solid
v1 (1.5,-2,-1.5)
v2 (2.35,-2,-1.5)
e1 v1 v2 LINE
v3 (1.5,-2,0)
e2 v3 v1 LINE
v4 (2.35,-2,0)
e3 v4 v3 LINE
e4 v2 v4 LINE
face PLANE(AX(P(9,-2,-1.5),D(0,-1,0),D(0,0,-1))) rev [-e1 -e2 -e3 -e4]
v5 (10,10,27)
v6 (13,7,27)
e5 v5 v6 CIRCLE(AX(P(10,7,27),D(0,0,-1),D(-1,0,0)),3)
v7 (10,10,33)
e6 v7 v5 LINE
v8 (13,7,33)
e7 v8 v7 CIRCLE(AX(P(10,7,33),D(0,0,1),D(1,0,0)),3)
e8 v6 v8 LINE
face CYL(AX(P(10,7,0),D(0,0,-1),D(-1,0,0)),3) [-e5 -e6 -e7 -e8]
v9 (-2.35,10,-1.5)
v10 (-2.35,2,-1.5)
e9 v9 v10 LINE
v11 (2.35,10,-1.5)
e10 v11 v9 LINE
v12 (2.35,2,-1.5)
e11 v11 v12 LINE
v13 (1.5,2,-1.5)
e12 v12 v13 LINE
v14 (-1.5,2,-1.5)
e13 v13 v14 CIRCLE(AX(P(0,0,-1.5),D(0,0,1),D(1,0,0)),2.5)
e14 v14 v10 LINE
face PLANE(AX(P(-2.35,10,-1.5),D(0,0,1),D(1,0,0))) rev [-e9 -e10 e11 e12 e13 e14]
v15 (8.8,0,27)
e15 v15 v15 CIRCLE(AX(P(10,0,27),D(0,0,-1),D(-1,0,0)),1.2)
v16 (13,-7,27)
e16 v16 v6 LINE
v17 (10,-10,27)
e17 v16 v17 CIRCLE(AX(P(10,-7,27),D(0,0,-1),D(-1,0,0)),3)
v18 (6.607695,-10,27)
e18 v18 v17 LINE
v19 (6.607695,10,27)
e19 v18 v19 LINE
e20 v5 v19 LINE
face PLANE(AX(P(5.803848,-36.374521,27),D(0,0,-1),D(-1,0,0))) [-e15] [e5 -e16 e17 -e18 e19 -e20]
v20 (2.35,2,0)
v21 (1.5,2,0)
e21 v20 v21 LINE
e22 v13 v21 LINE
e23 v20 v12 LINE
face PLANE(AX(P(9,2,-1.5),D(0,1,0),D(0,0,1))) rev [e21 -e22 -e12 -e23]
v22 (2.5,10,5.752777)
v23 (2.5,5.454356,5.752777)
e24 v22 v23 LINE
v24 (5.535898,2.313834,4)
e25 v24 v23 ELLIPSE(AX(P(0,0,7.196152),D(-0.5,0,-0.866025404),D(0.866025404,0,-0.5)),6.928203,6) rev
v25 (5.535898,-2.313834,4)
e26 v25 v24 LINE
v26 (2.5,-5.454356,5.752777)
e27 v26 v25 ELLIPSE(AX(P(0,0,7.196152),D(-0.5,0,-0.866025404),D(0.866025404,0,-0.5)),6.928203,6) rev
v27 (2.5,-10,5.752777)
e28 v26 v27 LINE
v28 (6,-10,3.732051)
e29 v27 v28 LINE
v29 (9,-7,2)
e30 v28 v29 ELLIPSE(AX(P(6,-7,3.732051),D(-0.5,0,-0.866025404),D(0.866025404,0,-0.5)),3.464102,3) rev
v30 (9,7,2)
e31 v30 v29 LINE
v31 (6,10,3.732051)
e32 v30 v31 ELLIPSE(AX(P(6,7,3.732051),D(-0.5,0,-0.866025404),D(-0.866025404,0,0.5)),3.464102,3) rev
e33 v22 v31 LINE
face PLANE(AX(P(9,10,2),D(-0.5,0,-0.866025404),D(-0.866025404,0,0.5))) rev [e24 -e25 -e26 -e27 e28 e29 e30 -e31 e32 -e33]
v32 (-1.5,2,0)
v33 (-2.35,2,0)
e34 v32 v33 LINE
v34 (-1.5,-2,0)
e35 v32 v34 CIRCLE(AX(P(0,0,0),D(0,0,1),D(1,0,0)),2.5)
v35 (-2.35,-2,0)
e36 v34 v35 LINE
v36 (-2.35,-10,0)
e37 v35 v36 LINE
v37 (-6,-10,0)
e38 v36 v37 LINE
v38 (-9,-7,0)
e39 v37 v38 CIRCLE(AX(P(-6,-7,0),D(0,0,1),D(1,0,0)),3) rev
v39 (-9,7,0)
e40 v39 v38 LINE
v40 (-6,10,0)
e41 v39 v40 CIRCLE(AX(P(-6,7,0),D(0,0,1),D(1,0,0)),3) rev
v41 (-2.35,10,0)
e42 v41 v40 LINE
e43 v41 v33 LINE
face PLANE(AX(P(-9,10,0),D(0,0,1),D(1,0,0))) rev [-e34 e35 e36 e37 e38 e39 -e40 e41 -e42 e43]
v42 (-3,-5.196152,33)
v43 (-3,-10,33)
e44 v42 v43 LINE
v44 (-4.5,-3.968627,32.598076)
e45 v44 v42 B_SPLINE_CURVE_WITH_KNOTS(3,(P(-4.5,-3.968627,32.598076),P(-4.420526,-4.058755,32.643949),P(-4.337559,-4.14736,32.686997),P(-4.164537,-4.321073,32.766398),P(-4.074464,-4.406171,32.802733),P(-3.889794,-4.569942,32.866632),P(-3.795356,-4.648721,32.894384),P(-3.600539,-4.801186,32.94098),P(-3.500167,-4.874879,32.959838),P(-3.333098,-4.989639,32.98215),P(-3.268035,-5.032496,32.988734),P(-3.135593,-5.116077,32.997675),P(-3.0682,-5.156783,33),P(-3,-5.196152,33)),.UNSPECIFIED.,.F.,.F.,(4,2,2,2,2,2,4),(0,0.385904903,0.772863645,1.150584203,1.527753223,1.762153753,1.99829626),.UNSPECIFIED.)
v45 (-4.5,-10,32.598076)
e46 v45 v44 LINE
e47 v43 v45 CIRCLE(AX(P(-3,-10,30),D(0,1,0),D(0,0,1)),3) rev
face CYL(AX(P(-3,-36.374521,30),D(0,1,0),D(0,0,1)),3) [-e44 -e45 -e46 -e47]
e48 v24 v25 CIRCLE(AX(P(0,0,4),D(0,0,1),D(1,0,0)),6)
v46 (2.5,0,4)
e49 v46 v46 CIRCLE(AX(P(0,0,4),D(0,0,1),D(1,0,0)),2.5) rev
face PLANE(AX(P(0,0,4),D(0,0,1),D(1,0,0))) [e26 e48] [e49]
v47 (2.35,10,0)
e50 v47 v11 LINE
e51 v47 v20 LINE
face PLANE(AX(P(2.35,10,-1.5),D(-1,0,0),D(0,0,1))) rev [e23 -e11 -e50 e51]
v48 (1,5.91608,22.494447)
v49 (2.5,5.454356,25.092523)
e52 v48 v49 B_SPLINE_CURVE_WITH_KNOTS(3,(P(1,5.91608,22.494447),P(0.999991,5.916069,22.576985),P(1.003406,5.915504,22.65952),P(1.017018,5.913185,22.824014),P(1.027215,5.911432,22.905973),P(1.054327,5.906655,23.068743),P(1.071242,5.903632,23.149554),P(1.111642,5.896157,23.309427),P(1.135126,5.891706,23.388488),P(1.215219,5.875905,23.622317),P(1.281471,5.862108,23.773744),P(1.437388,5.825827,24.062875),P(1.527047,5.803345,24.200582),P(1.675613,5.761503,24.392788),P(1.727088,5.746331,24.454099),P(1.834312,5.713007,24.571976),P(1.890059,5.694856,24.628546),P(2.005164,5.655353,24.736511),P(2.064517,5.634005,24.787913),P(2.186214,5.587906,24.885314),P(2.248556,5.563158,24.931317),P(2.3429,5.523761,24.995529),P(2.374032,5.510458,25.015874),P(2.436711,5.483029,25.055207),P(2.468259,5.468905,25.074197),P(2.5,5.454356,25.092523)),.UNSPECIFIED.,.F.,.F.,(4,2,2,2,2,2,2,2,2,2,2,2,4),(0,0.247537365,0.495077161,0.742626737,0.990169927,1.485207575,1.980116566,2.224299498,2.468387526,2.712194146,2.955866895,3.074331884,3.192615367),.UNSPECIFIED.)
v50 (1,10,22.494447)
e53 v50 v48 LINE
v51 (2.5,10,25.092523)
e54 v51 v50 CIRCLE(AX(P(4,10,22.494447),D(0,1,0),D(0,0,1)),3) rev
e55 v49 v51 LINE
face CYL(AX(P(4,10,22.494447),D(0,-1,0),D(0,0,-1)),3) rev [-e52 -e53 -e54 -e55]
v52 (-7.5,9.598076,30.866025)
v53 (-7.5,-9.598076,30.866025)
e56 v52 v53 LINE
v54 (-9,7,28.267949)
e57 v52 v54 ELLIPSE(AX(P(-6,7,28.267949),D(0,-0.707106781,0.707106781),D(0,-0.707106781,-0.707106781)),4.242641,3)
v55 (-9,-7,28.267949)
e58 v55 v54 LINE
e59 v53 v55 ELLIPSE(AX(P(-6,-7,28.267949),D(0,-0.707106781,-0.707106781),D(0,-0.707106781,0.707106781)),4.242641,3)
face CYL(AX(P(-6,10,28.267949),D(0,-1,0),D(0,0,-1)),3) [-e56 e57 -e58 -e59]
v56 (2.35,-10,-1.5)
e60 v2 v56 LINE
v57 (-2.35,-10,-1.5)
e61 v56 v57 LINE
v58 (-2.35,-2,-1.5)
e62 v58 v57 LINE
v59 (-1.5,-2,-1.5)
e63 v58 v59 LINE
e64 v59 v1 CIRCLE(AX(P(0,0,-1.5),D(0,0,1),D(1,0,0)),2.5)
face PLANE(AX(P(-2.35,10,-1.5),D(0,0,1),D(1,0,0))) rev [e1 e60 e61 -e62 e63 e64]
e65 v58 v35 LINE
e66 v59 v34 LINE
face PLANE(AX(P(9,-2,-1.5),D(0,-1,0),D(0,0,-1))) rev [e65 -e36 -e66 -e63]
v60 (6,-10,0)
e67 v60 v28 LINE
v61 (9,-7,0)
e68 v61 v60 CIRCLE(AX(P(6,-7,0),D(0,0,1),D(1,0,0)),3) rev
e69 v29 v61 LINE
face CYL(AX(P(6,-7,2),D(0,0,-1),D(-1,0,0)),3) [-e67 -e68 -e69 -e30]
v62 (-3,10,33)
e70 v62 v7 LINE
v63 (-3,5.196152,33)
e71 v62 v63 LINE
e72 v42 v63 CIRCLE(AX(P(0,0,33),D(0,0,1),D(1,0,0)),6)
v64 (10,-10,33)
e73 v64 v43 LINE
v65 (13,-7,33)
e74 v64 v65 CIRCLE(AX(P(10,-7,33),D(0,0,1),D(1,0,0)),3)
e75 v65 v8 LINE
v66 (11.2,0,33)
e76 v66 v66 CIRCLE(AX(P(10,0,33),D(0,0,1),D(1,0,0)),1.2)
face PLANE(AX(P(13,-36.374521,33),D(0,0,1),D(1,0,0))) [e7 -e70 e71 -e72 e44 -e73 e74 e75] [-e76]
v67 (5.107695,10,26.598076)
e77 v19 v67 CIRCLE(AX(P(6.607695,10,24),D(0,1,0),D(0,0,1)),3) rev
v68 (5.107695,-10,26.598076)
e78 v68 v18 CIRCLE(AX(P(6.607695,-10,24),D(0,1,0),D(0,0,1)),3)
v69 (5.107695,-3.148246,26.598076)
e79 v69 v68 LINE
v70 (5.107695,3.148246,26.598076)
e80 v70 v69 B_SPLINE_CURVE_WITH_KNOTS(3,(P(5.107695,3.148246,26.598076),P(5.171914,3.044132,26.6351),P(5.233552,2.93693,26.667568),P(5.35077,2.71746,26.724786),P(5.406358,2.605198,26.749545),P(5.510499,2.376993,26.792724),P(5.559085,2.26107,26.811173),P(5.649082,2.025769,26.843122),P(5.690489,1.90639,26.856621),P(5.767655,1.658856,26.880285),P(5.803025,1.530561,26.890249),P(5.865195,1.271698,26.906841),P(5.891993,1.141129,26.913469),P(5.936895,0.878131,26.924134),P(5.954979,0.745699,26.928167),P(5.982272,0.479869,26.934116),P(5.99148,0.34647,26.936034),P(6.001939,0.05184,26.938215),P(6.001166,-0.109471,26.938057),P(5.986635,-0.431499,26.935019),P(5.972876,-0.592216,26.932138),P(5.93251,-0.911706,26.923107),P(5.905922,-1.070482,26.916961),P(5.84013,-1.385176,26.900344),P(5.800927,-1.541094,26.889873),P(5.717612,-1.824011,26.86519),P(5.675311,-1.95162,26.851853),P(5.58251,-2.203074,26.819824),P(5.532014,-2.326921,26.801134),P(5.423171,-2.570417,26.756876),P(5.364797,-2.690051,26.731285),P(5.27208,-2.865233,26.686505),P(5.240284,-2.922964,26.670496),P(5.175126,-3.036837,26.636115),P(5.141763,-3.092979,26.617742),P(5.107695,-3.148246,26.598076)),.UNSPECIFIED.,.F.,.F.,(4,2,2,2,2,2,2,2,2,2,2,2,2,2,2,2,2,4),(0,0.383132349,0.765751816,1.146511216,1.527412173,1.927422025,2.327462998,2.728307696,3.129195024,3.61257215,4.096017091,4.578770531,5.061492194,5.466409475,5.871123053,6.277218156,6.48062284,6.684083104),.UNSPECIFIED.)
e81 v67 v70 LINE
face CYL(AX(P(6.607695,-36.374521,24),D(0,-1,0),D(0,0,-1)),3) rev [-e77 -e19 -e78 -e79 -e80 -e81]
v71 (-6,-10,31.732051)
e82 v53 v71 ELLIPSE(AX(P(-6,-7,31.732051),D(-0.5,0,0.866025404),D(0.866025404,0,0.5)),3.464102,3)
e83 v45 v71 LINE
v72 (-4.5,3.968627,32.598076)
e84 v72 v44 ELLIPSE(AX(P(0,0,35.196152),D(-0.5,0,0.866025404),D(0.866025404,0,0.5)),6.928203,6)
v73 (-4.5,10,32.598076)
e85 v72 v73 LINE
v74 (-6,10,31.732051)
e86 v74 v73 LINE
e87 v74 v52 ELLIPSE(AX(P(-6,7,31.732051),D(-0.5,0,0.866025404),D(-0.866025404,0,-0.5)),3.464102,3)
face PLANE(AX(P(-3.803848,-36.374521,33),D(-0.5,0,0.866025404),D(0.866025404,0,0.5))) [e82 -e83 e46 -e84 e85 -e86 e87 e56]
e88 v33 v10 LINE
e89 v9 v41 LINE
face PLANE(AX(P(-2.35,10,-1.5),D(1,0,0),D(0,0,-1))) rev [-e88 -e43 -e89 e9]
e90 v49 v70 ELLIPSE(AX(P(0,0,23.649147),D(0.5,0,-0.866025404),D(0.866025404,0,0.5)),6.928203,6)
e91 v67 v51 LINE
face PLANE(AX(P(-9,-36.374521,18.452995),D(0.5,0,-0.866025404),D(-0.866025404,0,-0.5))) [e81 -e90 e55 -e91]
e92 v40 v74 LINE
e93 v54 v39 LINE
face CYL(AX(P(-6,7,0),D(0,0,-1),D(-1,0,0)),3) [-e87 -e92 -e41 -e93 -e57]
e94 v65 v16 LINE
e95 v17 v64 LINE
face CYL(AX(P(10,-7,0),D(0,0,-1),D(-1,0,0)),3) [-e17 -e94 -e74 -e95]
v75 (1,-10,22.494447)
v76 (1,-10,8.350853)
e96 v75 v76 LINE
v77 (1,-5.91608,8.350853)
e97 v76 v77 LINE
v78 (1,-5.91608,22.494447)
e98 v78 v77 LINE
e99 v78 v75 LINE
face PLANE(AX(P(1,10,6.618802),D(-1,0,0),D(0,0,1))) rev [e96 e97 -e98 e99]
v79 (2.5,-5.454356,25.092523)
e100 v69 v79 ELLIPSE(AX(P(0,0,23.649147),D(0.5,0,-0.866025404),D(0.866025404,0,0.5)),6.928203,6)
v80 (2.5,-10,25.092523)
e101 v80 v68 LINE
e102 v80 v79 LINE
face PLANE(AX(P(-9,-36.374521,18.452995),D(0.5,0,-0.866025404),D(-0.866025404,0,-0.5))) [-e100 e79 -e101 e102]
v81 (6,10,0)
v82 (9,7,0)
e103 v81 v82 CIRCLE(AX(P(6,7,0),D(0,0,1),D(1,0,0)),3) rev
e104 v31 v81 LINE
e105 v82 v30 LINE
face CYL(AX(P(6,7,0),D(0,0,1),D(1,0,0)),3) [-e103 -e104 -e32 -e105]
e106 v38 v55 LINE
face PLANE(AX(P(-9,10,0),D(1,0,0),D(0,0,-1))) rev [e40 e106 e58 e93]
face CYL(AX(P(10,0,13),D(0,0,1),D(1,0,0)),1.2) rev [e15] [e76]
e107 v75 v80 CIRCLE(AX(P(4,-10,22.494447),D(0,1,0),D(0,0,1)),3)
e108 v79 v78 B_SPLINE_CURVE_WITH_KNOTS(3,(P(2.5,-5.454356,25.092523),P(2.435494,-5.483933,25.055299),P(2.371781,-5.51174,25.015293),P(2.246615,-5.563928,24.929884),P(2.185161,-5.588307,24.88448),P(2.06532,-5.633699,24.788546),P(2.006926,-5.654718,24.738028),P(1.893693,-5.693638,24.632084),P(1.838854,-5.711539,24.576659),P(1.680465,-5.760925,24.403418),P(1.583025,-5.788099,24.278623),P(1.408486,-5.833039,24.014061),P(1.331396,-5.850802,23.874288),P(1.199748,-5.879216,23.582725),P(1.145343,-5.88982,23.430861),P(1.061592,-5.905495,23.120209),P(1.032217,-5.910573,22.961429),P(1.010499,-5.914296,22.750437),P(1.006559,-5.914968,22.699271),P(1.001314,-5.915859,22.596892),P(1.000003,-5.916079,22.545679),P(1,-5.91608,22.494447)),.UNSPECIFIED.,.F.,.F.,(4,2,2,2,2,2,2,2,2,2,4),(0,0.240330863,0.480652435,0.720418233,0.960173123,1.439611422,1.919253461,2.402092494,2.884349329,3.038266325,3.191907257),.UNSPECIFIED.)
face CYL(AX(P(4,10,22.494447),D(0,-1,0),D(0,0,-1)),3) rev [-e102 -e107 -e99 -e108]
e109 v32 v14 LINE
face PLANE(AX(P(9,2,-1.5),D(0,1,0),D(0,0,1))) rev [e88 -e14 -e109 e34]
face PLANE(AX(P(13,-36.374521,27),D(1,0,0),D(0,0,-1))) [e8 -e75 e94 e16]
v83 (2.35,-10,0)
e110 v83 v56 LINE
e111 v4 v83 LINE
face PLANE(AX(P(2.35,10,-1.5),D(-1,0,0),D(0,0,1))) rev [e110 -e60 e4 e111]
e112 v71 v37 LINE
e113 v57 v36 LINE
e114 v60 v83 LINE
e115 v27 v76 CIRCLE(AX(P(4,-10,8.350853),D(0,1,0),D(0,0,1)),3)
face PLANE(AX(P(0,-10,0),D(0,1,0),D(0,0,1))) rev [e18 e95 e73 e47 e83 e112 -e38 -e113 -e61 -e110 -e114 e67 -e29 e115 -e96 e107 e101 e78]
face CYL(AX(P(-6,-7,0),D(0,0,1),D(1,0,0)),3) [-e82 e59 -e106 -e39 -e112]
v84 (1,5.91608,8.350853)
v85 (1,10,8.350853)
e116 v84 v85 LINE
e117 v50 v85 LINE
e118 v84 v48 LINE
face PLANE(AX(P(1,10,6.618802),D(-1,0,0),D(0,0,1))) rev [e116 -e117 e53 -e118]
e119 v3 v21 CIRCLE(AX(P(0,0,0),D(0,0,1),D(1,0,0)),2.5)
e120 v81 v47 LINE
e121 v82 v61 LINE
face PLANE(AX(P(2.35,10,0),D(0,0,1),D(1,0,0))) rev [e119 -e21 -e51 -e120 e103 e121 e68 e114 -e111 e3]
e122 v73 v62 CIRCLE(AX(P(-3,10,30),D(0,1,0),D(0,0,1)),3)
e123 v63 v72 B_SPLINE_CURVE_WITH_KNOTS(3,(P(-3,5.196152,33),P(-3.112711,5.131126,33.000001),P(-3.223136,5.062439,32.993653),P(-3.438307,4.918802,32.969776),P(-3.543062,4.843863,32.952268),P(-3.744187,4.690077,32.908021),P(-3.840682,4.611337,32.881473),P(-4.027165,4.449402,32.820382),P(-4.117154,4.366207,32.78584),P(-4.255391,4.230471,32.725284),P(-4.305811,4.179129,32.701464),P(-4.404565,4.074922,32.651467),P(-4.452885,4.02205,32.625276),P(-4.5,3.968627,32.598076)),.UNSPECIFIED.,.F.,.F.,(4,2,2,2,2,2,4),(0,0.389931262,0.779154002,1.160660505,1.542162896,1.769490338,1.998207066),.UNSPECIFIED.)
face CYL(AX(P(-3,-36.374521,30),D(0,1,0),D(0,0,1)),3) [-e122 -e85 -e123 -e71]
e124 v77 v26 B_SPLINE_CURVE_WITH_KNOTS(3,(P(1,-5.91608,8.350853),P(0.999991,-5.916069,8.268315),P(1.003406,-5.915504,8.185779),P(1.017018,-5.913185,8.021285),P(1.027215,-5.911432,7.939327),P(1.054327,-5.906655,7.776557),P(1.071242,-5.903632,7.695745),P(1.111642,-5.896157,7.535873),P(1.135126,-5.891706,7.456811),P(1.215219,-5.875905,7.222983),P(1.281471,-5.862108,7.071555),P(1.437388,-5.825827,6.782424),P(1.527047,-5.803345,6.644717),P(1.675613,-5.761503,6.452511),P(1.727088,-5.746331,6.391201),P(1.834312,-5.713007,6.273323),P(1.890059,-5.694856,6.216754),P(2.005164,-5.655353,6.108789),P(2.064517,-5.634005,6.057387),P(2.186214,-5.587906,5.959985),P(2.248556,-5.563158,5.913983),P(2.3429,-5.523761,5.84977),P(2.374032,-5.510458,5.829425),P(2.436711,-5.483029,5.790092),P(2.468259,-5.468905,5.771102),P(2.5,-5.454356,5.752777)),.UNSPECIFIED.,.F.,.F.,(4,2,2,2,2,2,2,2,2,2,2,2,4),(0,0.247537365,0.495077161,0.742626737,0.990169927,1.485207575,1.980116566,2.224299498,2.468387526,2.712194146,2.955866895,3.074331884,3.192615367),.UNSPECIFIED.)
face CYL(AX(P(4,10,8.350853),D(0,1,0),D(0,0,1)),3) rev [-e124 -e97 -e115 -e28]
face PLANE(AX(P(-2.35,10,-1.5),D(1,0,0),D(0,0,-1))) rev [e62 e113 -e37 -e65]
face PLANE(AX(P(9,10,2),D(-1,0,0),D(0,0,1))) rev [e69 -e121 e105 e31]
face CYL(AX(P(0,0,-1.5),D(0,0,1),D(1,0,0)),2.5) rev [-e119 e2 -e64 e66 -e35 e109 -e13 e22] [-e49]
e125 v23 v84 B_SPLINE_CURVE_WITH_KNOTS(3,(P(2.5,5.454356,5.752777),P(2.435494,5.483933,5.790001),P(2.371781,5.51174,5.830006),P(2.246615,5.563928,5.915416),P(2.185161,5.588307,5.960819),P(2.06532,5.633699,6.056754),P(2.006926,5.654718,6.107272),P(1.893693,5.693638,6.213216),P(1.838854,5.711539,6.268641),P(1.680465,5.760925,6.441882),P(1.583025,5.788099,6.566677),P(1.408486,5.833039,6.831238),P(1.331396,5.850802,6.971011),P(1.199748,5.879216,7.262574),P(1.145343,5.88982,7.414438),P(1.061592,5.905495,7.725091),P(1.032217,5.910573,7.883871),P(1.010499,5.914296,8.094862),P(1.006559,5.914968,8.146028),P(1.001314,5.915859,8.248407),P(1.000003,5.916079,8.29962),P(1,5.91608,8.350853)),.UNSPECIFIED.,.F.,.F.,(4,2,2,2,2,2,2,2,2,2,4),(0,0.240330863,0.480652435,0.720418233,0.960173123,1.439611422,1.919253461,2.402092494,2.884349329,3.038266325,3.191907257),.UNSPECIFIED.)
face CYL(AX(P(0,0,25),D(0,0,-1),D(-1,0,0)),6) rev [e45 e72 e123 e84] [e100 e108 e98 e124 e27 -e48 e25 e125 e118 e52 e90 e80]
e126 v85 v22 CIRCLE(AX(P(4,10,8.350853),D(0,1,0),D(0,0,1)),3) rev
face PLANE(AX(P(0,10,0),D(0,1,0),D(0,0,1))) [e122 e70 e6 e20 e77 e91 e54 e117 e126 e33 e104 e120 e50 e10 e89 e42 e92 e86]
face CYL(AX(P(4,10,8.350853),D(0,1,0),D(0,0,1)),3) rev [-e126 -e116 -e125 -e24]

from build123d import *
from build123d.topology import SkipClean

# Parameters (mm, degrees)
BOSS_EXTRU_1_DEPTH           = 10
ENL_V_MAT_EXTRU_1_DEPTH      = 29.854594898
ENL_V_MAT_EXTRU_1_DEPTH_BACK = 29.854594898
ESQUISSE2_R                  = 2.5
ENL_V_START                  = 4
ESQUISSE3_R                  = 6
ENL_V_MAT_EXTRU_2_DEPTH      = 25.390139133
ESQUISSE5_W                  = 1.5
ESQUISSE5_H                  = 4
ENL_V_MAT_EXTRU_3_DEPTH      = 30.220241272
BOSS_EXTRU_2_REACH           = 35.257
ENL_V_START_2                = -20
ESQUISSE7_R                  = 1.2
ESQUISSE7_R_2                = 6
ENL_V_MAT_EXTRU_4_DEPTH      = 20
CONG_1_START                 = -10
CONG_1_DEPTH                 = 20
CONG_1_2_DEPTH               = 20
CONG_1_START_2               = 5.75277665
CONG_1_3_OUTLINE_R           = 6
CONG_1_3_DEPTH               = 28.24722335
CONG_1_START_3               = -1.5
CONG_1_4_DEPTH               = 7.669577456
CONG_1_5_DEPTH               = 2.598076411
CONG_1_START_4               = 22.494446401
CONG_1_6_DEPTH               = 2.598076411
CONG_1_7_DEPTH               = 20


with BuildPart() as part:
    # Esquisse1 → Boss.-Extru.1 (new, symmetric)
    with BuildSketch(Plane(origin=(0, 0, 0), x_dir=(1, 0, 0), z_dir=(0, 1, 0))):
        Polygon((2.35, 0), (9, 0), (9, -2), (1, -6.618802154), (1, -25), (-9, -25), (-9, 0), (-2.35, 0), (-2.35, 1.5), (2.35, 1.5), align=None)
    extrude(amount=BOSS_EXTRU_1_DEPTH, both=True)

    # Esquisse2 → Enlèv. mat.-Extru.1 (cut, two sides: drawn at the far end of the back side and taken through both)
    with BuildSketch(Plane(origin=(-1.372446517, 0, 0), x_dir=(1, 0, 0), z_dir=(0, 0, 1)).offset(-ENL_V_MAT_EXTRU_1_DEPTH_BACK)):
        with Locations(Location((1.372446517, 0, 0), (0, 0, 340.051556411))):
            Circle(ESQUISSE2_R)
    extrude(amount=ENL_V_MAT_EXTRU_1_DEPTH + ENL_V_MAT_EXTRU_1_DEPTH_BACK, mode=Mode.SUBTRACT)

    # Esquisse3 → Enlèv. mat.-Extru.2 (cut, through all)
    with BuildSketch(Plane.XY.offset(ENL_V_START)):
        Circle(ESQUISSE3_R)
    extrude(amount=ENL_V_MAT_EXTRU_2_DEPTH, mode=Mode.SUBTRACT)

    # Esquisse5 → Enlèv. mat.-Extru.3 (cut, through all)
    with BuildSketch(Plane.ZY.offset(2.35)):
        with Locations((-0.75, 0)):
            Rectangle(ESQUISSE5_W, ESQUISSE5_H)
    extrude(amount=-ENL_V_MAT_EXTRU_3_DEPTH, mode=Mode.SUBTRACT)

    # Boss.-Extru.2: up to this face of the body (flat: up to its plane)
    boss_extru_2_end = Plane(part.part.faces().sort_by_distance((-2.923443816, -10, 10.980550797))[0])
    # Esquisse6 → Boss.-Extru.2 (add, up to the picked face)
    with BuildSketch(Plane(origin=(0, 10, 0), x_dir=(1, 0, 0), z_dir=(0, 1, 0)), mode=Mode.PRIVATE) as boss_extru_2_sk1:
        Polygon((-9, -18.452994616), (5.803847577, -27), (13, -27), (13, -33), (-3.803847577, -33), (-9, -30), align=None)
    boss_extru_2_tool1 = split(extrude(boss_extru_2_sk1.sketch, amount=-BOSS_EXTRU_2_REACH, mode=Mode.PRIVATE), bisect_by=boss_extru_2_end, keep=Keep.BOTH, mode=Mode.PRIVATE)
    add(boss_extru_2_tool1.solids().sort_by(Axis((0.338478, 10, 27.943024), (0, -1, 0)))[0])

    # Esquisse7 → Enlèv. mat.-Extru.4 (cut)
    with BuildSketch(Plane.XY.offset(33).offset(ENL_V_START_2)):
        with Locations((10, 0)):
            Circle(ESQUISSE7_R)
        with Locations(Location((0, 0, 0), (0, 0, 230.656026391))):
            Circle(ESQUISSE7_R_2)
    extrude(amount=ENL_V_MAT_EXTRU_4_DEPTH, mode=Mode.SUBTRACT)

    # Congé1: read off the stored shape, not the designer's step
    # Congé1 outline → Congé1 (cut)
    with BuildSketch(Plane(origin=(0, 0, 0), x_dir=(1, 0, 0), z_dir=(0, 1, 0)).offset(CONG_1_START)):
        with BuildLine():
            Line((-9, -30), (-7.5, -30.866025404))
            ThreePointArc((-7.5, -30.866025404), (-8.598076211, -29.767949192), (-9, -28.267949192))
            Line((-9, -28.267949192), (-9, -30))
        make_face()
    extrude(amount=CONG_1_DEPTH, mode=Mode.SUBTRACT)

    # Cong_1 2 outline → Cong_1 2 (add)
    with BuildSketch(Plane(origin=(0, 0, 0), x_dir=(1, 0, 0), z_dir=(0, 1, 0)).offset(CONG_1_START)):
        with BuildLine():
            Line((5.803847577, -27), (6.607695155, -27))
            ThreePointArc((6.607695155, -27), (5.83123802, -26.897777479), (5.107695155, -26.598076211))
            Line((5.107695155, -26.598076211), (5.803847577, -27))
        make_face()
    extrude(amount=CONG_1_2_DEPTH)

    # Cong_1 3 outline → Cong_1 3 (cut)
    with BuildSketch(Plane.XY.offset(CONG_1_START_2)):
        with BuildLine():
            Line((-9, 10), (-9, 7))
            ThreePointArc((-9, 7), (-8.121320344, 9.121320344), (-6, 10))
            Line((-6, 10), (-9, 10))
        make_face()
        with BuildLine():
            ThreePointArc((-6, -10), (-8.121320344, -9.121320344), (-9, -7))
            Line((-9, -7), (-9, -10))
            Line((-9, -10), (-6, -10))
        make_face()
        Circle(CONG_1_3_OUTLINE_R)
        with BuildLine():
            Line((13, 10), (10, 10))
            ThreePointArc((10, 10), (12.121320344, 9.121320344), (13, 7))
            Line((13, 7), (13, 10))
        make_face()
        with BuildLine():
            ThreePointArc((13, -7), (12.121320344, -9.121320344), (10, -10))
            Line((10, -10), (13, -10))
            Line((13, -10), (13, -7))
        make_face()
    extrude(amount=CONG_1_3_DEPTH, mode=Mode.SUBTRACT)

    # Cong_1 4 outline → Cong_1 4 (cut)
    with BuildSketch(Plane.XY.offset(CONG_1_START_3)):
        with BuildLine():
            Line((-9, 10), (-9, 7))
            ThreePointArc((-9, 7), (-8.121320344, 9.121320344), (-6, 10))
            Line((-6, 10), (-9, 10))
        make_face()
        with BuildLine():
            ThreePointArc((-6, -10), (-8.121320344, -9.121320344), (-9, -7))
            Line((-9, -7), (-9, -10))
            Line((-9, -10), (-6, -10))
        make_face()
        with BuildLine():
            Line((9, 10), (6, 10))
            ThreePointArc((6, 10), (8.121320344, 9.121320344), (9, 7))
            Line((9, 7), (9, 10))
        make_face()
        with BuildLine():
            ThreePointArc((9, -7), (8.121320344, -9.121320344), (6, -10))
            Line((6, -10), (9, -10))
            Line((9, -10), (9, -7))
        make_face()
    extrude(amount=CONG_1_4_DEPTH, mode=Mode.SUBTRACT)

    # Cong_1 5 outline → Cong_1 5 (add)
    with SkipClean():  # the faces are left unmerged after this step: merging them gives an invalid solid
        with BuildSketch(Plane.XY.offset(CONG_1_START_2)):
            with BuildLine():
                Line((6, 10), (1, 10))
                Line((1, 10), (1, 5.916079783))
                ThreePointArc((1, 5.916079783), (6, 0), (1, -5.916079783))
                Line((1, -5.916079783), (1, -10))
                Line((1, -10), (6, -10))
                ThreePointArc((6, -10), (8.121320344, -9.121320344), (9, -7))
                Line((9, -7), (9, 7))
                ThreePointArc((9, 7), (8.121320344, 9.121320344), (6, 10))
            make_face()
        extrude(amount=CONG_1_5_DEPTH)

    # Cong_1 6 outline → Cong_1 6 (add)
    with SkipClean():  # the faces are left unmerged after this step: merging them gives an invalid solid
        with BuildSketch(Plane.XY.offset(CONG_1_START_4)):
            with BuildLine():
                Line((6, 10), (1, 10))
                Line((1, 10), (1, 5.916079783))
                ThreePointArc((1, 5.916079783), (6, 0), (1, -5.916079783))
                Line((1, -5.916079783), (1, -10))
                Line((1, -10), (6, -10))
                ThreePointArc((6, -10), (8.121320344, -9.121320344), (9, -7))
                Line((9, -7), (9, 7))
                ThreePointArc((9, 7), (8.121320344, 9.121320344), (6, 10))
            make_face()
        extrude(amount=CONG_1_6_DEPTH)

    # Cong_1 7 outline → Cong_1 7 (cut)
    with SkipClean():  # the faces are left unmerged after this step: merging them gives an invalid solid
        with BuildSketch(Plane(origin=(0, 0, 0), x_dir=(1, 0, 0), z_dir=(0, 1, 0)).offset(CONG_1_START)):
            with BuildLine():
                ThreePointArc((-3, -33), (-3.776457135, -32.897777479), (-4.5, -32.598076211))
                Line((-4.5, -32.598076211), (-3.803847577, -33))
                Line((-3.803847577, -33), (-3, -33))
            make_face()
            with BuildLine():
                ThreePointArc((1, -22.494446501), (1.401923789, -23.994446501), (2.5, -25.092522712))
                Line((2.5, -25.092522712), (9, -25.092522812))
                Line((9, -25.092522812), (9, -22.494446401))
                Line((9, -22.494446401), (1, -22.494446501))
            make_face()
            with BuildLine():
                Line((9, -5.75277665), (2.5, -5.75277675))
                ThreePointArc((2.5, -5.75277675), (1.401923789, -6.850852961), (1, -8.350852961))
                Line((1, -8.350852961), (9, -8.350853061))
                Line((9, -8.350853061), (9, -5.75277665))
            make_face()
        extrude(amount=CONG_1_7_DEPTH, mode=Mode.SUBTRACT)


solid = part.part
